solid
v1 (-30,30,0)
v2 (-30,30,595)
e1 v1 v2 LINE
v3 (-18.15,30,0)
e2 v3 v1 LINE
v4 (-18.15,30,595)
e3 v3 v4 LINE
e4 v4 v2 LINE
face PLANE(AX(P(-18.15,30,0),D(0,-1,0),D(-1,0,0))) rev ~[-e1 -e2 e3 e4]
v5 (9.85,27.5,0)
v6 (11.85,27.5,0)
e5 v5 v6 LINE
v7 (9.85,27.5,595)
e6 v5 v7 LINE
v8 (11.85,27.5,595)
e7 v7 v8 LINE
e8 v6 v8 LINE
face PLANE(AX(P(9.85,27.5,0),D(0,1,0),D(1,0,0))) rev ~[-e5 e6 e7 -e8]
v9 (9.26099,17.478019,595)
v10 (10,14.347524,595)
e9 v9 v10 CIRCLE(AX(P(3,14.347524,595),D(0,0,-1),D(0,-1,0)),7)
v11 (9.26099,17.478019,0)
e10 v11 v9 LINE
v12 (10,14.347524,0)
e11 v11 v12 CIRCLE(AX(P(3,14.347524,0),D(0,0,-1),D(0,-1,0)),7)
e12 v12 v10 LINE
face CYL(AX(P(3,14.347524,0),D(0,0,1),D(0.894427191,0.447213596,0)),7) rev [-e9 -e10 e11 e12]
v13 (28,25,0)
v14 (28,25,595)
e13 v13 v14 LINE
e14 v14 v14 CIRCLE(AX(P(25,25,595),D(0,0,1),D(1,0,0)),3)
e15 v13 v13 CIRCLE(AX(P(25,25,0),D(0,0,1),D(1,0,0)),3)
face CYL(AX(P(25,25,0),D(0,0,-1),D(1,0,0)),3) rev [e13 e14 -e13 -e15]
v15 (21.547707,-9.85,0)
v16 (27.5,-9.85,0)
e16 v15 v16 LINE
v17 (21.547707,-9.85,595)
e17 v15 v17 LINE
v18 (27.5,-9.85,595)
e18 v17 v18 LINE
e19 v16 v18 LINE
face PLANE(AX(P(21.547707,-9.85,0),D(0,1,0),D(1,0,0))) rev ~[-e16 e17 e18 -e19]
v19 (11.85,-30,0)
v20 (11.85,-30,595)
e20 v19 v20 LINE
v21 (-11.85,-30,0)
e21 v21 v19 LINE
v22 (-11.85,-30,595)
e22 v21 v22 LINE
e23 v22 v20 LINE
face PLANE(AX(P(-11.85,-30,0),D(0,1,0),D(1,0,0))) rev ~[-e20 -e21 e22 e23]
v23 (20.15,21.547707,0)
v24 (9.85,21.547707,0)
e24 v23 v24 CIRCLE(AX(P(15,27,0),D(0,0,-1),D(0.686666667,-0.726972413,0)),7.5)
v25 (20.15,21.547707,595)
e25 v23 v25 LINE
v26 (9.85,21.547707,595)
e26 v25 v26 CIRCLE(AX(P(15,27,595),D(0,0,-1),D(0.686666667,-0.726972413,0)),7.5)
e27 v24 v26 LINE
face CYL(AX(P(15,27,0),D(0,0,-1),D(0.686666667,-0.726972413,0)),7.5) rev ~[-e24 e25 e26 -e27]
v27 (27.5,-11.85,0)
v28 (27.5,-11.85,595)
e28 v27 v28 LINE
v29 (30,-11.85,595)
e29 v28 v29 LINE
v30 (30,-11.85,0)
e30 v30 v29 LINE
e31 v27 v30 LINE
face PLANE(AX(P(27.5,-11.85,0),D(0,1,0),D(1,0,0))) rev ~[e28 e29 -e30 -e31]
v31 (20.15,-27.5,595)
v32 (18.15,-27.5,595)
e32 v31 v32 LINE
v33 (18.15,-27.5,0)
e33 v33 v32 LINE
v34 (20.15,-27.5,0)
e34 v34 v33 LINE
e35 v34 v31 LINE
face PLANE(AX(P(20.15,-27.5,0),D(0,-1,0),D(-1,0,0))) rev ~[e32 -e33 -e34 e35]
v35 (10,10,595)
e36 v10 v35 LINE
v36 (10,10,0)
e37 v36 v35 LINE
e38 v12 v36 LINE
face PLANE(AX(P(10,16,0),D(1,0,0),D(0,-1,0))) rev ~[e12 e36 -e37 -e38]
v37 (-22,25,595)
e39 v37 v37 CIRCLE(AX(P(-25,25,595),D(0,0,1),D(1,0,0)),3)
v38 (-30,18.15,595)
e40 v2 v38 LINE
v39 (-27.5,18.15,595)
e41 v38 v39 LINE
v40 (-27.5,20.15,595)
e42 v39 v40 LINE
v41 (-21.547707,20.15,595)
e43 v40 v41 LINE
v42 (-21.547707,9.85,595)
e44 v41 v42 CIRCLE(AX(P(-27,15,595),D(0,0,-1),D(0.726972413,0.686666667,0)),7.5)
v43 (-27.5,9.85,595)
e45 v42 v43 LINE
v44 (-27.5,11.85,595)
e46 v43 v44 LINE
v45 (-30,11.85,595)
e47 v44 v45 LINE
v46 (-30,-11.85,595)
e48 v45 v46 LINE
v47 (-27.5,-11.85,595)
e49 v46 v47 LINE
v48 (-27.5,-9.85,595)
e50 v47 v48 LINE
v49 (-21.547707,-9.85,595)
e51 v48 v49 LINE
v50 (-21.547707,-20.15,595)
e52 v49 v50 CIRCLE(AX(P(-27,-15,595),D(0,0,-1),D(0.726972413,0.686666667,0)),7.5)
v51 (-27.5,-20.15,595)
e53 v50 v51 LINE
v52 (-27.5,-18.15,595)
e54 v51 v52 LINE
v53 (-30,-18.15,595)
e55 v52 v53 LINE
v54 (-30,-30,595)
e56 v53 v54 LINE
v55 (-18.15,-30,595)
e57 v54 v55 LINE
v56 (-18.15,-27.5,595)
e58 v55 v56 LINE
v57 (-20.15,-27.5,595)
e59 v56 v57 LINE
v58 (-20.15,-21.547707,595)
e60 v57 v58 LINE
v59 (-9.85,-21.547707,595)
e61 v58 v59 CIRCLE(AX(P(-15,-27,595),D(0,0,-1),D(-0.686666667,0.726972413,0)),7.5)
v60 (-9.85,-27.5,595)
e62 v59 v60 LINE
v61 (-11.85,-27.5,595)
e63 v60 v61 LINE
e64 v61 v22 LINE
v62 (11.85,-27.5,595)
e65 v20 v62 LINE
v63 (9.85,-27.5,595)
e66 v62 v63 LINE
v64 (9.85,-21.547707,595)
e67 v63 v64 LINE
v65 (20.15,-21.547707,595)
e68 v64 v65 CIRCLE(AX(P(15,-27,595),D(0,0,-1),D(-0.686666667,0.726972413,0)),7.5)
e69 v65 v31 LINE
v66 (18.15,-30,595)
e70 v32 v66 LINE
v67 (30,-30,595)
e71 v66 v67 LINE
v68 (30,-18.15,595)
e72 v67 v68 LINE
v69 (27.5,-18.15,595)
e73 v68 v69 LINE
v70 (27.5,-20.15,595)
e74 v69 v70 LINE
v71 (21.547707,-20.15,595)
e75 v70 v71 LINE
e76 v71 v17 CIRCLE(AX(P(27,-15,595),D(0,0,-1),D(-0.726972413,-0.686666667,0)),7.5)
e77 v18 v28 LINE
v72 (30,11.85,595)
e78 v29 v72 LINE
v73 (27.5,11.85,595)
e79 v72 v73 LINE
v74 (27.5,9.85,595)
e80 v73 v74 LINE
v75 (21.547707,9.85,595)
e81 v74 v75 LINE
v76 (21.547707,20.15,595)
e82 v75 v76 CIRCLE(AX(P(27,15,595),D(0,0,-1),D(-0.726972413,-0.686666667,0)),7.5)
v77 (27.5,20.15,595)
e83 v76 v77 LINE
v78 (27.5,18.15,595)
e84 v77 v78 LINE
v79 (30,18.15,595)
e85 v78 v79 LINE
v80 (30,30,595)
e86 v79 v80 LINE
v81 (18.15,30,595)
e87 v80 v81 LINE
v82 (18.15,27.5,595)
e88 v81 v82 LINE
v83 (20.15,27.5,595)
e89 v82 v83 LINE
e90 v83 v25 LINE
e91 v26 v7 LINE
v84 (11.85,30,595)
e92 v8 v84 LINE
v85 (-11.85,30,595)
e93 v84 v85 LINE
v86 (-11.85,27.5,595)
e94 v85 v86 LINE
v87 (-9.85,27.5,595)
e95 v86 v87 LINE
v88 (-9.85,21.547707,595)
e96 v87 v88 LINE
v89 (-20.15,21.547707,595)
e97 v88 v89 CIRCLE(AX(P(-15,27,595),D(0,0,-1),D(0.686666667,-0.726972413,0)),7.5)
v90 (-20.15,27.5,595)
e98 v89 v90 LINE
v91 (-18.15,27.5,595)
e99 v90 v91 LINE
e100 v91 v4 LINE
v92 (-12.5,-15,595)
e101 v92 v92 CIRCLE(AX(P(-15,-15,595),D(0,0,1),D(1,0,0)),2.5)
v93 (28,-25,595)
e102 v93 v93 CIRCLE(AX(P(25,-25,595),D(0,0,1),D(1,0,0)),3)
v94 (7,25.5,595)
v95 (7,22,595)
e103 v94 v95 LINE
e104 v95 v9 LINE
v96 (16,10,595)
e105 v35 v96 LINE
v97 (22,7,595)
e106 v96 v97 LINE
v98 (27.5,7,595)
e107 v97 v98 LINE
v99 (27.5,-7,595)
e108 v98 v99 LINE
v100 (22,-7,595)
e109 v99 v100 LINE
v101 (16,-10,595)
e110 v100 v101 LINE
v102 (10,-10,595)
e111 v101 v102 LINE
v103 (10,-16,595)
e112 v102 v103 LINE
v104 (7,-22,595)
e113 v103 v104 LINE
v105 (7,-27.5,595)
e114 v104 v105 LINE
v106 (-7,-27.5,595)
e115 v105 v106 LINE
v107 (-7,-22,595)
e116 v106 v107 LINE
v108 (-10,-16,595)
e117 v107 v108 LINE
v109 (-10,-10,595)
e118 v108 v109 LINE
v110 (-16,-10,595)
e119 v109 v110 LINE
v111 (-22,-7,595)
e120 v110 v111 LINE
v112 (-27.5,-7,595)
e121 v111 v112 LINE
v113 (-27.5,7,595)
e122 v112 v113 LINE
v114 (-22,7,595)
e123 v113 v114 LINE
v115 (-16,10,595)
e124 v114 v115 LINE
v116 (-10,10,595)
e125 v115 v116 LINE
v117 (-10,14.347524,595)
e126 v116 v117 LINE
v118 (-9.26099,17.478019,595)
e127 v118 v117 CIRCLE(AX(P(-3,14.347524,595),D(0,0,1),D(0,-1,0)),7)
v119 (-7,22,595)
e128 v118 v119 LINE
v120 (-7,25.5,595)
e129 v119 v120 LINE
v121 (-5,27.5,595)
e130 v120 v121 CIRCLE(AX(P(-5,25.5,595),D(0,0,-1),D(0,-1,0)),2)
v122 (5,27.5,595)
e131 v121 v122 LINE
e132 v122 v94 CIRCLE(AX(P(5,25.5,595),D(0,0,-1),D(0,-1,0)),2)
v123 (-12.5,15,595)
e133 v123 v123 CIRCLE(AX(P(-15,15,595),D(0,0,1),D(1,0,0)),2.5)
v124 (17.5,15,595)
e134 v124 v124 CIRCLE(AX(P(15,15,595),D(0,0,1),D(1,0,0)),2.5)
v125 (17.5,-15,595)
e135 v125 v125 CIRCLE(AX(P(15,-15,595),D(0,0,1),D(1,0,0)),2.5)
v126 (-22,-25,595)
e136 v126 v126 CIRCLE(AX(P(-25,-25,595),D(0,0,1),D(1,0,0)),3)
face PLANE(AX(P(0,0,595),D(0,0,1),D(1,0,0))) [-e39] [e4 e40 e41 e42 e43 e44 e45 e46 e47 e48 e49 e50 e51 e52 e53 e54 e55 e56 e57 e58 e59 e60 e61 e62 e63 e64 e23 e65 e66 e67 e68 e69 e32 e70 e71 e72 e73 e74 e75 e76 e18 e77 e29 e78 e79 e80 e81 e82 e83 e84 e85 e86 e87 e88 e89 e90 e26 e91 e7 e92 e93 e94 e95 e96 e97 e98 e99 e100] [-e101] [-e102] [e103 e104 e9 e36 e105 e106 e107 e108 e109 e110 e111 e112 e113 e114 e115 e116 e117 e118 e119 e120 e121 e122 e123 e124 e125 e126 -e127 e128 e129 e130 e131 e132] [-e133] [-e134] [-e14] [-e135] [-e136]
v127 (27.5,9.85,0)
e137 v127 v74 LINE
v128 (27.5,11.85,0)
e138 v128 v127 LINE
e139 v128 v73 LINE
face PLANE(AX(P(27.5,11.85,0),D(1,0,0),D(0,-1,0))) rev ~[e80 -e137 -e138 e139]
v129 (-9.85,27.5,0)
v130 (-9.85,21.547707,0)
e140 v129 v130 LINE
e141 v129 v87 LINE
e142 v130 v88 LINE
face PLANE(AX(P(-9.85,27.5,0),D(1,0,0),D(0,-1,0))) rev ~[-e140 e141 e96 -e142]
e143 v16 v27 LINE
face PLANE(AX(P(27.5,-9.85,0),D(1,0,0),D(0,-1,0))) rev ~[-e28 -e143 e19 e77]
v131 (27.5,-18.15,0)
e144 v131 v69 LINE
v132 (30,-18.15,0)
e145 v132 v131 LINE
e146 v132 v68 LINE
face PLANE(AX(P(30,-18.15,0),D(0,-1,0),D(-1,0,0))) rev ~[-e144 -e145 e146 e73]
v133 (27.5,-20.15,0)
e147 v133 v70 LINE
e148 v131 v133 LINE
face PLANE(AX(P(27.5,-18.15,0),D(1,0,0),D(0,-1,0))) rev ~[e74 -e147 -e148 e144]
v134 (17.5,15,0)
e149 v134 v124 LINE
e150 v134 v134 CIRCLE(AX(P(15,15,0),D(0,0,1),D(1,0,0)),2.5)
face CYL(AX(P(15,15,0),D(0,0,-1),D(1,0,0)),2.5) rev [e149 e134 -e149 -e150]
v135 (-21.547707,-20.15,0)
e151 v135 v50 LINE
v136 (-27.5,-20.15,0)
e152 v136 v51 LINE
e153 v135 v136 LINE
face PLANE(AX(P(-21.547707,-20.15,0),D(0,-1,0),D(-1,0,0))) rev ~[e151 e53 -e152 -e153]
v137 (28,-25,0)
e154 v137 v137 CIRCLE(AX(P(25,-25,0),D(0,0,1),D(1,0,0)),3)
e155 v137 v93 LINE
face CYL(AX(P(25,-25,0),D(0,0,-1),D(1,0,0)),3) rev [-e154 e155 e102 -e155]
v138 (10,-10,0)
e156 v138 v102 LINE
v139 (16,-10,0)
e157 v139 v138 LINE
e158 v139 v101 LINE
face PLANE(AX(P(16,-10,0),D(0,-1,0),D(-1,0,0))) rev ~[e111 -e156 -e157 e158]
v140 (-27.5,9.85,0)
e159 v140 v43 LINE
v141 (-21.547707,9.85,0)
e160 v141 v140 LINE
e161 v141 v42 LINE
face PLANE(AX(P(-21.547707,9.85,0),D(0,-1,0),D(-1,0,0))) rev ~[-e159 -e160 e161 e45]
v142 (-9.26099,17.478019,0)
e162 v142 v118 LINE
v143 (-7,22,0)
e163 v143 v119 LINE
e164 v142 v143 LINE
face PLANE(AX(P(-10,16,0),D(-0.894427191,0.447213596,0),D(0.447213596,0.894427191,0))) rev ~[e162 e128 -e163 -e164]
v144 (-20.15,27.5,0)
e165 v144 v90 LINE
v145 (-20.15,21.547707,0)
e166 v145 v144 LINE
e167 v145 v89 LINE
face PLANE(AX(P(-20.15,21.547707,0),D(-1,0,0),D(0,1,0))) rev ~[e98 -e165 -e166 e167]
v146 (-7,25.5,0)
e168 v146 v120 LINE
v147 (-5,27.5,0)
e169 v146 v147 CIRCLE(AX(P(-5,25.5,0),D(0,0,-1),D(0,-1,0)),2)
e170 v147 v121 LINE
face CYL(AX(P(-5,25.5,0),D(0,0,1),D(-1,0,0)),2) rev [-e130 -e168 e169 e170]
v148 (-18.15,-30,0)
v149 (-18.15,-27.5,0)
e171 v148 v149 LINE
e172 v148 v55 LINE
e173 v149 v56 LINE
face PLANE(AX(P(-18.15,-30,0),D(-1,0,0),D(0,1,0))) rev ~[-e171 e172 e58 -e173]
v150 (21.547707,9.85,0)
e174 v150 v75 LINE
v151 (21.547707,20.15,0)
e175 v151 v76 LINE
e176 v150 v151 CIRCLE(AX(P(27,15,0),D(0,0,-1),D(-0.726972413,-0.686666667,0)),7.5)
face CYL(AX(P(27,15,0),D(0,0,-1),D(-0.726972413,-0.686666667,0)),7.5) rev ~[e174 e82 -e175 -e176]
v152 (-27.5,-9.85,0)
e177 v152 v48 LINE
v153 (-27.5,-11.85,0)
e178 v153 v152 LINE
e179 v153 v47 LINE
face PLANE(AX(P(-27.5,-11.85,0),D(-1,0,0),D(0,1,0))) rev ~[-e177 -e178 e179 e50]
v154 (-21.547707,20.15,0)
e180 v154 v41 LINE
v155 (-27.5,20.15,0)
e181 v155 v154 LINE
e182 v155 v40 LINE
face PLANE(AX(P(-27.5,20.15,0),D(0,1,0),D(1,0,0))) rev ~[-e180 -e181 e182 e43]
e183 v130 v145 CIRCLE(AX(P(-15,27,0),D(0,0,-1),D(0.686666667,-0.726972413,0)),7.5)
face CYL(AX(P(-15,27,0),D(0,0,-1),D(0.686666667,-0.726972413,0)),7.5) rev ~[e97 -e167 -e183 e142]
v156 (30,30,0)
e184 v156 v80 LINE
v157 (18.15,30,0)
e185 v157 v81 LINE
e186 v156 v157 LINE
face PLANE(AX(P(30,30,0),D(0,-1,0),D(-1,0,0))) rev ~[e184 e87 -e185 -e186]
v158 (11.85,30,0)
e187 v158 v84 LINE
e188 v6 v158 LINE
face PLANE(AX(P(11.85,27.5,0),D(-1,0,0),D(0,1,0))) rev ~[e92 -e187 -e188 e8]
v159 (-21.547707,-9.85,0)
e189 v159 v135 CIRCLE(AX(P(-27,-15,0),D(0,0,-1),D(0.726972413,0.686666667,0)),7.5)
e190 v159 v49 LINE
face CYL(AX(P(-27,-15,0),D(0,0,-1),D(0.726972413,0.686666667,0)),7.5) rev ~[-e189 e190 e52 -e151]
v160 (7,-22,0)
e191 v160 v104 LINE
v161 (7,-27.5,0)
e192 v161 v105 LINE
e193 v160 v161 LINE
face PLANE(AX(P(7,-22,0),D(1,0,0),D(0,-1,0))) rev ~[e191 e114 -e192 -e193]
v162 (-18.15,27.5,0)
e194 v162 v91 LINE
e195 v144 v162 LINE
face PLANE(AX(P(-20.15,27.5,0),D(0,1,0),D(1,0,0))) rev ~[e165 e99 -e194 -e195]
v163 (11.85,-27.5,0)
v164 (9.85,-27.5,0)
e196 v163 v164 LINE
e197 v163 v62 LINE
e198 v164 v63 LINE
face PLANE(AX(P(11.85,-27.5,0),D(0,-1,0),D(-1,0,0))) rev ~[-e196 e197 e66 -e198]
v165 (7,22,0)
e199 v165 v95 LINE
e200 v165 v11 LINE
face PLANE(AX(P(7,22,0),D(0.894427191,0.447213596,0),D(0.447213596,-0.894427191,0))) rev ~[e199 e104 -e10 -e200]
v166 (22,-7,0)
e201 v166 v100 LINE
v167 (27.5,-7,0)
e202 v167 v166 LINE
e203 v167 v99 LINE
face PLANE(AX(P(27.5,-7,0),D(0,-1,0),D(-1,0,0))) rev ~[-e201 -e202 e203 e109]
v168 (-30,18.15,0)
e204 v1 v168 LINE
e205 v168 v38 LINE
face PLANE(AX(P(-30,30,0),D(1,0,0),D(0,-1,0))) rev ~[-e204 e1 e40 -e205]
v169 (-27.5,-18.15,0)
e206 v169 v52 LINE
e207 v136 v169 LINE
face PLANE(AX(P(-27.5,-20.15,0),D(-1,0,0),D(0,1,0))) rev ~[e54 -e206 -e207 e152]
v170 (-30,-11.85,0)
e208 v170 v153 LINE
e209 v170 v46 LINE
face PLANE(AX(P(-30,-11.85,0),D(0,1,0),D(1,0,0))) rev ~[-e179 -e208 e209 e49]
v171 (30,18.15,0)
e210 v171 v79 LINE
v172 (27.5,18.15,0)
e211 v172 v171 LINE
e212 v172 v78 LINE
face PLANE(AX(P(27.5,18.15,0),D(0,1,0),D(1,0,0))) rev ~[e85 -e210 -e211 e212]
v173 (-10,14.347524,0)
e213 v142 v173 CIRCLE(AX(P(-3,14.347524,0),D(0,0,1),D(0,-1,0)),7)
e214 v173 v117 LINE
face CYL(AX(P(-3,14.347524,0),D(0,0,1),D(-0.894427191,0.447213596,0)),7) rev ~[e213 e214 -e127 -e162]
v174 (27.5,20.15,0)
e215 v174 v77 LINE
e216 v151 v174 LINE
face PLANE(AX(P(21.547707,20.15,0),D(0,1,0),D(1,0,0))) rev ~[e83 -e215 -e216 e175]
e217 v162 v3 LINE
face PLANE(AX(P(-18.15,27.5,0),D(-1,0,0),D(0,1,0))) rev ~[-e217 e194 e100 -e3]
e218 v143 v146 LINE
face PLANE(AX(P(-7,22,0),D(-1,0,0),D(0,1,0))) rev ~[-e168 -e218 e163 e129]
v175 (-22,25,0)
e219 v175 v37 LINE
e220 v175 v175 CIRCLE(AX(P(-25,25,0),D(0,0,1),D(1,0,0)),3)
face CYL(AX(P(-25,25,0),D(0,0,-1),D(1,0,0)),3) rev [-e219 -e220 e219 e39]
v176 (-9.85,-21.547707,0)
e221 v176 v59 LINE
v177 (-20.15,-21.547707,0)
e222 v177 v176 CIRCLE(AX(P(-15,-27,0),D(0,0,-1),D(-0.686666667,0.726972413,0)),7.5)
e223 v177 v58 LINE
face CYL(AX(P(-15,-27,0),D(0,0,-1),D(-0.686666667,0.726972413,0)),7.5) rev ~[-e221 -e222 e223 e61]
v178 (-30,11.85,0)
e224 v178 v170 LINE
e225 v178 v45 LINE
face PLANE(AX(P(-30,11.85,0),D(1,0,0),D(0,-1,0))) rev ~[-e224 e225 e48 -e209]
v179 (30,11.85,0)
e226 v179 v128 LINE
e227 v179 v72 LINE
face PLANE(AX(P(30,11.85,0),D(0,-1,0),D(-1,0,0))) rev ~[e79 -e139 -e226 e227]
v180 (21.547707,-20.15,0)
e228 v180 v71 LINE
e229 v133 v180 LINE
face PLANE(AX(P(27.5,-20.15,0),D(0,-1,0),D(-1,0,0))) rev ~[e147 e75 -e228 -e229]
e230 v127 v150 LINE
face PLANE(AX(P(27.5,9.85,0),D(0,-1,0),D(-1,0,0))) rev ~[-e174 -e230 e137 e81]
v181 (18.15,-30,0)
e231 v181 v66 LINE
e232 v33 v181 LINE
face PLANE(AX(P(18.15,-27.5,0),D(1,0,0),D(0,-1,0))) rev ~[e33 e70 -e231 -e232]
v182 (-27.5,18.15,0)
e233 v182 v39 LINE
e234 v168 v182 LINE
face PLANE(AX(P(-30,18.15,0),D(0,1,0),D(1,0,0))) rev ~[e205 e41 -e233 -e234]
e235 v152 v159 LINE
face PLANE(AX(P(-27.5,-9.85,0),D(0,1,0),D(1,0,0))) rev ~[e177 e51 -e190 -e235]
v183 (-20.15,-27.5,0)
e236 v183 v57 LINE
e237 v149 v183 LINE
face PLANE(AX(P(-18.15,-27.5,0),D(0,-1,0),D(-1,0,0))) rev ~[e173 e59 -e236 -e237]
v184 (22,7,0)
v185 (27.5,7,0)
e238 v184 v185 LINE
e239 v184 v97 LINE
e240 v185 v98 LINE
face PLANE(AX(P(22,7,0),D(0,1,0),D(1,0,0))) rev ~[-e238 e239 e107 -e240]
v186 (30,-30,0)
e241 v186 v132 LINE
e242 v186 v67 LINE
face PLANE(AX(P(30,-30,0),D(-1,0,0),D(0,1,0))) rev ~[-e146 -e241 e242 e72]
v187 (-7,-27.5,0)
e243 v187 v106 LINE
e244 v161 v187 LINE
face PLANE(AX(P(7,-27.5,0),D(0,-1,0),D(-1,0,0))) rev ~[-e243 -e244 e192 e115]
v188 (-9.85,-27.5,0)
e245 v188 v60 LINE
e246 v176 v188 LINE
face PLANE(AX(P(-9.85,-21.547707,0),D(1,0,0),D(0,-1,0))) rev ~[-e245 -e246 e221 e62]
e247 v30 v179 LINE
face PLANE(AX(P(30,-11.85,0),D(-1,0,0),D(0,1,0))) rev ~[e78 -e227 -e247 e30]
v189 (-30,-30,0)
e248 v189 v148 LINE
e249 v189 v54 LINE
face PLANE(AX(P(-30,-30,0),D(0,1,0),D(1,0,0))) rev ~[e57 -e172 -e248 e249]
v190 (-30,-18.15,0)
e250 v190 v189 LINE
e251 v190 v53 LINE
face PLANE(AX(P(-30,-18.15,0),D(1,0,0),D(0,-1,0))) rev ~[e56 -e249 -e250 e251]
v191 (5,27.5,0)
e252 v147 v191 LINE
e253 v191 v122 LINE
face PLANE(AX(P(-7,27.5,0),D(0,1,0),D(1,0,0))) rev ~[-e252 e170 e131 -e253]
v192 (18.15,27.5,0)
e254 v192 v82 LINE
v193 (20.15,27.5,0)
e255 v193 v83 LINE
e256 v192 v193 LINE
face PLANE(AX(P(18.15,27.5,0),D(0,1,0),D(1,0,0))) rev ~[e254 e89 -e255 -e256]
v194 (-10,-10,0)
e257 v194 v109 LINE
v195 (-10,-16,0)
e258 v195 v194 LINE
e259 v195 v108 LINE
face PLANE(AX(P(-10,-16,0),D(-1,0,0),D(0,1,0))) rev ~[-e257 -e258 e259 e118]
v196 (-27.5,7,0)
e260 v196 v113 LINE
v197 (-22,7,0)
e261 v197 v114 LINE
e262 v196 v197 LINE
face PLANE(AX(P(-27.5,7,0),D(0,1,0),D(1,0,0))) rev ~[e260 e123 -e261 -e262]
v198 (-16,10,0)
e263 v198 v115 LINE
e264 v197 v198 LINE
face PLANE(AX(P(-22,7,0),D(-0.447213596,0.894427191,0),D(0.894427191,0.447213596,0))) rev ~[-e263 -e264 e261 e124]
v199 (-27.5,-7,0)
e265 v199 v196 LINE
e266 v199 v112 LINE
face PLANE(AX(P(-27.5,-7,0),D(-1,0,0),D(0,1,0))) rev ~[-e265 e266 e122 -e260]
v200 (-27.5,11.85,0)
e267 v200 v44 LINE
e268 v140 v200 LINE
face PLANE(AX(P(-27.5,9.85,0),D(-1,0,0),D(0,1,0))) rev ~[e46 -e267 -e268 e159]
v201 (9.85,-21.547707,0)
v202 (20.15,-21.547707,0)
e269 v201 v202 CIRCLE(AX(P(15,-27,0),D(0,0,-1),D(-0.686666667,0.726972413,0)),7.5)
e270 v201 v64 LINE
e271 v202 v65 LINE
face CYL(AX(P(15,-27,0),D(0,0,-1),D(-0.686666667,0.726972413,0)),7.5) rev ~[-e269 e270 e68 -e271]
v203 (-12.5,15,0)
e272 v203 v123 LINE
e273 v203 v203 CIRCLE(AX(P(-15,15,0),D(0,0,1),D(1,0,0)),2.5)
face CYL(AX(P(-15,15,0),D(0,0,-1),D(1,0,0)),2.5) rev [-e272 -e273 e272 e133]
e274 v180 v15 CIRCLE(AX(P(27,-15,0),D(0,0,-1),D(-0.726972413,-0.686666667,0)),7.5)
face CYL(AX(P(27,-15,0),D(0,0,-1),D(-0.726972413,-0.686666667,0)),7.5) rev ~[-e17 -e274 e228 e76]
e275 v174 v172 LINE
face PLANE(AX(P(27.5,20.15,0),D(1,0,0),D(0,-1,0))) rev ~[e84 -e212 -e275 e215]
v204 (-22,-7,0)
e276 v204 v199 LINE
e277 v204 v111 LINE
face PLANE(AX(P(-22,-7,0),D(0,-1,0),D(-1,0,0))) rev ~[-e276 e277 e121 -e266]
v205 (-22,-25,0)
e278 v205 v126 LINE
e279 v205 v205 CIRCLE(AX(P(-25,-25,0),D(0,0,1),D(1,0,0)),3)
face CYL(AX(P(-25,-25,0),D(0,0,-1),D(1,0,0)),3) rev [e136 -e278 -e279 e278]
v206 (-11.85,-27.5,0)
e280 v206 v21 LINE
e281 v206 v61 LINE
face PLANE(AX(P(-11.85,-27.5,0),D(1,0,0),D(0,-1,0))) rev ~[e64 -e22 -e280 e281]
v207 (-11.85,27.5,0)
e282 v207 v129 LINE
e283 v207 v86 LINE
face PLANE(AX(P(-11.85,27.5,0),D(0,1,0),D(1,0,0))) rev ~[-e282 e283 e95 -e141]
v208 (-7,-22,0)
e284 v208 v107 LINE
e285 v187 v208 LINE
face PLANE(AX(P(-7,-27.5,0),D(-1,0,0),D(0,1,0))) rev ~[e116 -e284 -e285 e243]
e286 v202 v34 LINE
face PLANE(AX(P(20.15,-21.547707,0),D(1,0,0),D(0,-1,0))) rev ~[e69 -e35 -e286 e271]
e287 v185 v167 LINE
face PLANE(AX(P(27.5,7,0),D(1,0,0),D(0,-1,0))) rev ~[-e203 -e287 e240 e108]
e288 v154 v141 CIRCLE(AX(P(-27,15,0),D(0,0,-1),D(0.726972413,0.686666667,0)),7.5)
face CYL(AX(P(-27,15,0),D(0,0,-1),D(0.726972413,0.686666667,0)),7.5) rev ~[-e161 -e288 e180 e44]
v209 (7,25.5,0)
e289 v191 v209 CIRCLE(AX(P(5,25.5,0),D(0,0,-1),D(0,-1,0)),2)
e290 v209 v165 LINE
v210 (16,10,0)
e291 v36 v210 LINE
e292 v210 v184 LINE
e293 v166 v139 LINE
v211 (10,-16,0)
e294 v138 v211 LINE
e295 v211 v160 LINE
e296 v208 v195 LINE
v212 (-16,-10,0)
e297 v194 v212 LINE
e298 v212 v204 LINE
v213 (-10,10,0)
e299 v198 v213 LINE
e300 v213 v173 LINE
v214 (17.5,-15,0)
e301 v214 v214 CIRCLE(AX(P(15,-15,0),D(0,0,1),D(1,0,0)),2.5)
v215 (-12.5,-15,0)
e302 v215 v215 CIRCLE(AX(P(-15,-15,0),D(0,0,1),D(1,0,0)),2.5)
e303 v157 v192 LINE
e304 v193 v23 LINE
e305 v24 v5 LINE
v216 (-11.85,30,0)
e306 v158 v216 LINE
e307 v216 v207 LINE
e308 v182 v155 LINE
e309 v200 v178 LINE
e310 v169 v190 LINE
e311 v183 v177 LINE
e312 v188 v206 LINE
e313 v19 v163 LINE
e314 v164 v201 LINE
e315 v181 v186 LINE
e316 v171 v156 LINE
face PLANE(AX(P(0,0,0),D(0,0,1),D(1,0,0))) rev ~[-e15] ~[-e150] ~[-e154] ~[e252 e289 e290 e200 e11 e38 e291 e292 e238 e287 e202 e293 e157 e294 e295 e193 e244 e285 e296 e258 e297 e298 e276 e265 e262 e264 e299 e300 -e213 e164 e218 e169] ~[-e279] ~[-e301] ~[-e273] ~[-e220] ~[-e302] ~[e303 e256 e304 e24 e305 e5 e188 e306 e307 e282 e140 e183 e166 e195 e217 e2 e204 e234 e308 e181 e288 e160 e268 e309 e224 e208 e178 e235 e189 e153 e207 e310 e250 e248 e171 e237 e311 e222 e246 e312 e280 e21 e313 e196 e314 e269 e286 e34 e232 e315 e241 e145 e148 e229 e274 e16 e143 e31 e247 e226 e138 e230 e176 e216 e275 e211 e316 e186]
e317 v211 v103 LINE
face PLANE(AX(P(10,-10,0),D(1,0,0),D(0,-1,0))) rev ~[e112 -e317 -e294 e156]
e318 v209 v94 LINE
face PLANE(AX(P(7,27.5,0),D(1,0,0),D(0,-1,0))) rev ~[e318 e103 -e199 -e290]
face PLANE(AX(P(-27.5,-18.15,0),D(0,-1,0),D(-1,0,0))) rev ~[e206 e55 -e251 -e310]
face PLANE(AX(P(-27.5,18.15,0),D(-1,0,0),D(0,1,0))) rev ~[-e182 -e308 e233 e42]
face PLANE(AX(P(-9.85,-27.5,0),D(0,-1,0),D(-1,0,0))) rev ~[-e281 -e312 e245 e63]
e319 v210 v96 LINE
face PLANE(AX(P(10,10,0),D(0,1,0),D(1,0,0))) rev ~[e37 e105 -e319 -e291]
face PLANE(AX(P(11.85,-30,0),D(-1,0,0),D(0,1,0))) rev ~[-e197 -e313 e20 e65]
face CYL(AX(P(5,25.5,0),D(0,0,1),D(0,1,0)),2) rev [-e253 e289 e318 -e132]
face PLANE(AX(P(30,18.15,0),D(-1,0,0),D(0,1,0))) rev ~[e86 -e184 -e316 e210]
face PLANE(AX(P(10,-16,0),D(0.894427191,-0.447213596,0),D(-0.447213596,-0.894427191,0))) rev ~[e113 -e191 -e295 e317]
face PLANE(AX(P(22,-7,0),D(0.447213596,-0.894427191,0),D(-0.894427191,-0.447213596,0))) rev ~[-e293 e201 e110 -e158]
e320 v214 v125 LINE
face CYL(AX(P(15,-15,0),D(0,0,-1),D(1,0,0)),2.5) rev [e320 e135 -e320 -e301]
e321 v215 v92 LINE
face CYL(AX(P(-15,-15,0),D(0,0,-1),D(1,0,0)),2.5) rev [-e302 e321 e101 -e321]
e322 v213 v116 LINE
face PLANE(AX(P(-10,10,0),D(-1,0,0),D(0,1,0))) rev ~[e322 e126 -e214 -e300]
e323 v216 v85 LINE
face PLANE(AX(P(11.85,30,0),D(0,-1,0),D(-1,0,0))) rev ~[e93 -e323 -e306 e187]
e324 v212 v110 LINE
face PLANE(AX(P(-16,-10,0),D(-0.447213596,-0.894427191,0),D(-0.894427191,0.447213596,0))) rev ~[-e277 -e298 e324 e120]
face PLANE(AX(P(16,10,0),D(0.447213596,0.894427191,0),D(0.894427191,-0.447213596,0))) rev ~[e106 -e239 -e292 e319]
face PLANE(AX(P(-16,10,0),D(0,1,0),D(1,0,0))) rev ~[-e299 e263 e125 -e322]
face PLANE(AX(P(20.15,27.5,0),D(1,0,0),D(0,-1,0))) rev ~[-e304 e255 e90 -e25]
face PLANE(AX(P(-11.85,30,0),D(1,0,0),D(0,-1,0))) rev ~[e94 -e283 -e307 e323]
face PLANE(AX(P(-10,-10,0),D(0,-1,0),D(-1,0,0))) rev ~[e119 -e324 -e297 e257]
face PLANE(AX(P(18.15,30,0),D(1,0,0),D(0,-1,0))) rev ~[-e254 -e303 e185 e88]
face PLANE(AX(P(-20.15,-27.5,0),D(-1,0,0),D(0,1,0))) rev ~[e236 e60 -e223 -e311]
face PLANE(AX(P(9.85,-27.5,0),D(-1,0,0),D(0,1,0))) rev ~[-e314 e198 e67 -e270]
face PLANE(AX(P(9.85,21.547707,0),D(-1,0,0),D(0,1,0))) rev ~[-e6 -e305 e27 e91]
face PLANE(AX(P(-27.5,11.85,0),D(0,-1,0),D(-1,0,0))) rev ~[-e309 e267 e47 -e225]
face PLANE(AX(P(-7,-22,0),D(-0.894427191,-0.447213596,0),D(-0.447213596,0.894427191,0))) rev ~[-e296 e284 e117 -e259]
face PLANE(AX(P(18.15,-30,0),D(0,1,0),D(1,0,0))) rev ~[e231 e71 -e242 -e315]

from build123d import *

# Parameters (mm, degrees)
F0_R     = 3
F0_R_2   = 2.5
F1_DEPTH = 595
F2_R     = 2
F3_R     = 7


# Not quite as in the source:
# - a feature names something its author has since deleted; it is built from what else it names


with BuildPart() as f1:
    # F0 (on Top) → F1 (new body)
    with BuildSketch(Plane.XY):
        with BuildLine():
            Line((18.15, -30), (30, -30))
            Line((30, -30), (30, -18.15))
            Line((30, -18.15), (27.5, -18.15))
            Line((27.5, -18.15), (27.5, -20.15))
            Line((27.5, -20.15), (21.5477069044, -20.15))
            ThreePointArc((21.5477069044, -20.15), (19.5, -15), (21.5477069044, -9.85))
            Line((21.5477069044, -9.85), (27.5, -9.85))
            Line((27.5, -9.85), (27.5, -11.85))
            Line((27.5, -11.85), (30, -11.85))
            Line((30, -11.85), (30, 11.85))
            Line((30, 11.85), (27.5, 11.85))
            Line((27.5, 11.85), (27.5, 9.85))
            Line((27.5, 9.85), (21.5477069044, 9.85))
            ThreePointArc((21.5477069044, 9.85), (19.5, 15), (21.5477069044, 20.15))
            Line((21.5477069044, 20.15), (27.5, 20.15))
            Line((27.5, 20.15), (27.5, 18.15))
            Line((27.5, 18.15), (30, 18.15))
            Line((30, 18.15), (30, 30))
            Line((30, 30), (18.15, 30))
            Line((18.15, 30), (18.15, 27.5))
            Line((18.15, 27.5), (20.15, 27.5))
            Line((20.15, 27.5), (20.15, 21.5477069044))
            ThreePointArc((20.15, 21.5477069044), (15, 19.5), (9.85, 21.5477069044))
            Line((9.85, 21.5477069044), (9.85, 27.5))
            Line((9.85, 27.5), (11.85, 27.5))
            Line((11.85, 27.5), (11.85, 30))
            Line((11.85, 30), (-11.85, 30))
            Line((-11.85, 30), (-11.85, 27.5))
            Line((-11.85, 27.5), (-9.85, 27.5))
            Line((-9.85, 27.5), (-9.85, 21.5477069044))
            ThreePointArc((-9.85, 21.5477069044), (-15, 19.5), (-20.15, 21.5477069044))
            Line((-20.15, 21.5477069044), (-20.15, 27.5))
            Line((-20.15, 27.5), (-18.15, 27.5))
            Line((-18.15, 27.5), (-18.15, 30))
            Line((-18.15, 30), (-30, 30))
            Line((-30, 30), (-30, 18.15))
            Line((-30, 18.15), (-27.5, 18.15))
            Line((-27.5, 18.15), (-27.5, 20.15))
            Line((-27.5, 20.15), (-21.5477069044, 20.15))
            ThreePointArc((-21.5477069044, 20.15), (-19.5, 15), (-21.5477069044, 9.85))
            Line((-21.5477069044, 9.85), (-27.5, 9.85))
            Line((-27.5, 9.85), (-27.5, 11.85))
            Line((-27.5, 11.85), (-30, 11.85))
            Line((-30, 11.85), (-30, -11.85))
            Line((-30, -11.85), (-27.5, -11.85))
            Line((-27.5, -11.85), (-27.5, -9.85))
            Line((-27.5, -9.85), (-21.5477069044, -9.85))
            ThreePointArc((-21.5477069044, -9.85), (-19.5, -15), (-21.5477069044, -20.15))
            Line((-21.5477069044, -20.15), (-27.5, -20.15))
            Line((-27.5, -20.15), (-27.5, -18.15))
            Line((-27.5, -18.15), (-30, -18.15))
            Line((-30, -18.15), (-30, -30))
            Line((-30, -30), (-18.15, -30))
            Line((-18.15, -30), (-18.15, -27.5))
            Line((-18.15, -27.5), (-20.15, -27.5))
            Line((-20.15, -27.5), (-20.15, -21.5477069044))
            ThreePointArc((-20.15, -21.5477069044), (-15, -19.5), (-9.85, -21.5477069044))
            Line((-9.85, -21.5477069044), (-9.85, -27.5))
            Line((-9.85, -27.5), (-11.85, -27.5))
            Line((-11.85, -27.5), (-11.85, -30))
            Line((-11.85, -30), (11.85, -30))
            Line((11.85, -30), (11.85, -27.5))
            Line((11.85, -27.5), (9.85, -27.5))
            Line((9.85, -27.5), (9.85, -21.5477069044))
            ThreePointArc((9.85, -21.5477069044), (15, -19.5), (20.15, -21.5477069044))
            Line((20.15, -21.5477069044), (20.15, -27.5))
            Line((20.15, -27.5), (18.15, -27.5))
            Line((18.15, -27.5), (18.15, -30))
        make_face()
        with Locations((-25, -25)):
            Circle(F0_R, mode=Mode.SUBTRACT)
        with Locations((-15, -15)):
            Circle(F0_R_2, mode=Mode.SUBTRACT)
        with Locations((25, -25)):
            Circle(F0_R, mode=Mode.SUBTRACT)
        with Locations((15, -15)):
            Circle(F0_R_2, mode=Mode.SUBTRACT)
        with Locations((-25, 25)):
            Circle(F0_R, mode=Mode.SUBTRACT)
        with Locations((-15, 15)):
            Circle(F0_R_2, mode=Mode.SUBTRACT)
        Polygon((-7, 22), (-7, 27.5), (0, 27.5), (7, 27.5), (7, 22), (10, 16), (10, 10), (16, 10), (22, 7), (27.5, 7), (27.5, 0), (27.5, -7), (22, -7), (16, -10), (10, -10), (10, -16), (7, -22), (7, -27.5), (0, -27.5), (-7, -27.5), (-7, -22), (-10, -16), (-10, -10), (-16, -10), (-22, -7), (-27.5, -7), (-27.5, 0), (-27.5, 7), (-22, 7), (-16, 10), (-10, 10), (-10, 16), align=None, mode=Mode.SUBTRACT)
        with Locations((15, 15)):
            Circle(F0_R_2, mode=Mode.SUBTRACT)
        with Locations((25, 25)):
            Circle(F0_R, mode=Mode.SUBTRACT)
    extrude(amount=F1_DEPTH)

    # F2
    f2_edges = [f1.edges().sort_by_distance(p)[0] for p in [
        (-7, 27.5, 297.5),
        (7, 27.5, 297.5),
    ]]
    fillet(f2_edges, radius=F2_R)

    # F3
    f3_edges = [f1.edges().sort_by_distance(p)[0] for p in [
        (-10, 16, 297.5),
        (10, 16, 297.5),
    ]]
    fillet(f3_edges, radius=F3_R)


solid = f1.part
